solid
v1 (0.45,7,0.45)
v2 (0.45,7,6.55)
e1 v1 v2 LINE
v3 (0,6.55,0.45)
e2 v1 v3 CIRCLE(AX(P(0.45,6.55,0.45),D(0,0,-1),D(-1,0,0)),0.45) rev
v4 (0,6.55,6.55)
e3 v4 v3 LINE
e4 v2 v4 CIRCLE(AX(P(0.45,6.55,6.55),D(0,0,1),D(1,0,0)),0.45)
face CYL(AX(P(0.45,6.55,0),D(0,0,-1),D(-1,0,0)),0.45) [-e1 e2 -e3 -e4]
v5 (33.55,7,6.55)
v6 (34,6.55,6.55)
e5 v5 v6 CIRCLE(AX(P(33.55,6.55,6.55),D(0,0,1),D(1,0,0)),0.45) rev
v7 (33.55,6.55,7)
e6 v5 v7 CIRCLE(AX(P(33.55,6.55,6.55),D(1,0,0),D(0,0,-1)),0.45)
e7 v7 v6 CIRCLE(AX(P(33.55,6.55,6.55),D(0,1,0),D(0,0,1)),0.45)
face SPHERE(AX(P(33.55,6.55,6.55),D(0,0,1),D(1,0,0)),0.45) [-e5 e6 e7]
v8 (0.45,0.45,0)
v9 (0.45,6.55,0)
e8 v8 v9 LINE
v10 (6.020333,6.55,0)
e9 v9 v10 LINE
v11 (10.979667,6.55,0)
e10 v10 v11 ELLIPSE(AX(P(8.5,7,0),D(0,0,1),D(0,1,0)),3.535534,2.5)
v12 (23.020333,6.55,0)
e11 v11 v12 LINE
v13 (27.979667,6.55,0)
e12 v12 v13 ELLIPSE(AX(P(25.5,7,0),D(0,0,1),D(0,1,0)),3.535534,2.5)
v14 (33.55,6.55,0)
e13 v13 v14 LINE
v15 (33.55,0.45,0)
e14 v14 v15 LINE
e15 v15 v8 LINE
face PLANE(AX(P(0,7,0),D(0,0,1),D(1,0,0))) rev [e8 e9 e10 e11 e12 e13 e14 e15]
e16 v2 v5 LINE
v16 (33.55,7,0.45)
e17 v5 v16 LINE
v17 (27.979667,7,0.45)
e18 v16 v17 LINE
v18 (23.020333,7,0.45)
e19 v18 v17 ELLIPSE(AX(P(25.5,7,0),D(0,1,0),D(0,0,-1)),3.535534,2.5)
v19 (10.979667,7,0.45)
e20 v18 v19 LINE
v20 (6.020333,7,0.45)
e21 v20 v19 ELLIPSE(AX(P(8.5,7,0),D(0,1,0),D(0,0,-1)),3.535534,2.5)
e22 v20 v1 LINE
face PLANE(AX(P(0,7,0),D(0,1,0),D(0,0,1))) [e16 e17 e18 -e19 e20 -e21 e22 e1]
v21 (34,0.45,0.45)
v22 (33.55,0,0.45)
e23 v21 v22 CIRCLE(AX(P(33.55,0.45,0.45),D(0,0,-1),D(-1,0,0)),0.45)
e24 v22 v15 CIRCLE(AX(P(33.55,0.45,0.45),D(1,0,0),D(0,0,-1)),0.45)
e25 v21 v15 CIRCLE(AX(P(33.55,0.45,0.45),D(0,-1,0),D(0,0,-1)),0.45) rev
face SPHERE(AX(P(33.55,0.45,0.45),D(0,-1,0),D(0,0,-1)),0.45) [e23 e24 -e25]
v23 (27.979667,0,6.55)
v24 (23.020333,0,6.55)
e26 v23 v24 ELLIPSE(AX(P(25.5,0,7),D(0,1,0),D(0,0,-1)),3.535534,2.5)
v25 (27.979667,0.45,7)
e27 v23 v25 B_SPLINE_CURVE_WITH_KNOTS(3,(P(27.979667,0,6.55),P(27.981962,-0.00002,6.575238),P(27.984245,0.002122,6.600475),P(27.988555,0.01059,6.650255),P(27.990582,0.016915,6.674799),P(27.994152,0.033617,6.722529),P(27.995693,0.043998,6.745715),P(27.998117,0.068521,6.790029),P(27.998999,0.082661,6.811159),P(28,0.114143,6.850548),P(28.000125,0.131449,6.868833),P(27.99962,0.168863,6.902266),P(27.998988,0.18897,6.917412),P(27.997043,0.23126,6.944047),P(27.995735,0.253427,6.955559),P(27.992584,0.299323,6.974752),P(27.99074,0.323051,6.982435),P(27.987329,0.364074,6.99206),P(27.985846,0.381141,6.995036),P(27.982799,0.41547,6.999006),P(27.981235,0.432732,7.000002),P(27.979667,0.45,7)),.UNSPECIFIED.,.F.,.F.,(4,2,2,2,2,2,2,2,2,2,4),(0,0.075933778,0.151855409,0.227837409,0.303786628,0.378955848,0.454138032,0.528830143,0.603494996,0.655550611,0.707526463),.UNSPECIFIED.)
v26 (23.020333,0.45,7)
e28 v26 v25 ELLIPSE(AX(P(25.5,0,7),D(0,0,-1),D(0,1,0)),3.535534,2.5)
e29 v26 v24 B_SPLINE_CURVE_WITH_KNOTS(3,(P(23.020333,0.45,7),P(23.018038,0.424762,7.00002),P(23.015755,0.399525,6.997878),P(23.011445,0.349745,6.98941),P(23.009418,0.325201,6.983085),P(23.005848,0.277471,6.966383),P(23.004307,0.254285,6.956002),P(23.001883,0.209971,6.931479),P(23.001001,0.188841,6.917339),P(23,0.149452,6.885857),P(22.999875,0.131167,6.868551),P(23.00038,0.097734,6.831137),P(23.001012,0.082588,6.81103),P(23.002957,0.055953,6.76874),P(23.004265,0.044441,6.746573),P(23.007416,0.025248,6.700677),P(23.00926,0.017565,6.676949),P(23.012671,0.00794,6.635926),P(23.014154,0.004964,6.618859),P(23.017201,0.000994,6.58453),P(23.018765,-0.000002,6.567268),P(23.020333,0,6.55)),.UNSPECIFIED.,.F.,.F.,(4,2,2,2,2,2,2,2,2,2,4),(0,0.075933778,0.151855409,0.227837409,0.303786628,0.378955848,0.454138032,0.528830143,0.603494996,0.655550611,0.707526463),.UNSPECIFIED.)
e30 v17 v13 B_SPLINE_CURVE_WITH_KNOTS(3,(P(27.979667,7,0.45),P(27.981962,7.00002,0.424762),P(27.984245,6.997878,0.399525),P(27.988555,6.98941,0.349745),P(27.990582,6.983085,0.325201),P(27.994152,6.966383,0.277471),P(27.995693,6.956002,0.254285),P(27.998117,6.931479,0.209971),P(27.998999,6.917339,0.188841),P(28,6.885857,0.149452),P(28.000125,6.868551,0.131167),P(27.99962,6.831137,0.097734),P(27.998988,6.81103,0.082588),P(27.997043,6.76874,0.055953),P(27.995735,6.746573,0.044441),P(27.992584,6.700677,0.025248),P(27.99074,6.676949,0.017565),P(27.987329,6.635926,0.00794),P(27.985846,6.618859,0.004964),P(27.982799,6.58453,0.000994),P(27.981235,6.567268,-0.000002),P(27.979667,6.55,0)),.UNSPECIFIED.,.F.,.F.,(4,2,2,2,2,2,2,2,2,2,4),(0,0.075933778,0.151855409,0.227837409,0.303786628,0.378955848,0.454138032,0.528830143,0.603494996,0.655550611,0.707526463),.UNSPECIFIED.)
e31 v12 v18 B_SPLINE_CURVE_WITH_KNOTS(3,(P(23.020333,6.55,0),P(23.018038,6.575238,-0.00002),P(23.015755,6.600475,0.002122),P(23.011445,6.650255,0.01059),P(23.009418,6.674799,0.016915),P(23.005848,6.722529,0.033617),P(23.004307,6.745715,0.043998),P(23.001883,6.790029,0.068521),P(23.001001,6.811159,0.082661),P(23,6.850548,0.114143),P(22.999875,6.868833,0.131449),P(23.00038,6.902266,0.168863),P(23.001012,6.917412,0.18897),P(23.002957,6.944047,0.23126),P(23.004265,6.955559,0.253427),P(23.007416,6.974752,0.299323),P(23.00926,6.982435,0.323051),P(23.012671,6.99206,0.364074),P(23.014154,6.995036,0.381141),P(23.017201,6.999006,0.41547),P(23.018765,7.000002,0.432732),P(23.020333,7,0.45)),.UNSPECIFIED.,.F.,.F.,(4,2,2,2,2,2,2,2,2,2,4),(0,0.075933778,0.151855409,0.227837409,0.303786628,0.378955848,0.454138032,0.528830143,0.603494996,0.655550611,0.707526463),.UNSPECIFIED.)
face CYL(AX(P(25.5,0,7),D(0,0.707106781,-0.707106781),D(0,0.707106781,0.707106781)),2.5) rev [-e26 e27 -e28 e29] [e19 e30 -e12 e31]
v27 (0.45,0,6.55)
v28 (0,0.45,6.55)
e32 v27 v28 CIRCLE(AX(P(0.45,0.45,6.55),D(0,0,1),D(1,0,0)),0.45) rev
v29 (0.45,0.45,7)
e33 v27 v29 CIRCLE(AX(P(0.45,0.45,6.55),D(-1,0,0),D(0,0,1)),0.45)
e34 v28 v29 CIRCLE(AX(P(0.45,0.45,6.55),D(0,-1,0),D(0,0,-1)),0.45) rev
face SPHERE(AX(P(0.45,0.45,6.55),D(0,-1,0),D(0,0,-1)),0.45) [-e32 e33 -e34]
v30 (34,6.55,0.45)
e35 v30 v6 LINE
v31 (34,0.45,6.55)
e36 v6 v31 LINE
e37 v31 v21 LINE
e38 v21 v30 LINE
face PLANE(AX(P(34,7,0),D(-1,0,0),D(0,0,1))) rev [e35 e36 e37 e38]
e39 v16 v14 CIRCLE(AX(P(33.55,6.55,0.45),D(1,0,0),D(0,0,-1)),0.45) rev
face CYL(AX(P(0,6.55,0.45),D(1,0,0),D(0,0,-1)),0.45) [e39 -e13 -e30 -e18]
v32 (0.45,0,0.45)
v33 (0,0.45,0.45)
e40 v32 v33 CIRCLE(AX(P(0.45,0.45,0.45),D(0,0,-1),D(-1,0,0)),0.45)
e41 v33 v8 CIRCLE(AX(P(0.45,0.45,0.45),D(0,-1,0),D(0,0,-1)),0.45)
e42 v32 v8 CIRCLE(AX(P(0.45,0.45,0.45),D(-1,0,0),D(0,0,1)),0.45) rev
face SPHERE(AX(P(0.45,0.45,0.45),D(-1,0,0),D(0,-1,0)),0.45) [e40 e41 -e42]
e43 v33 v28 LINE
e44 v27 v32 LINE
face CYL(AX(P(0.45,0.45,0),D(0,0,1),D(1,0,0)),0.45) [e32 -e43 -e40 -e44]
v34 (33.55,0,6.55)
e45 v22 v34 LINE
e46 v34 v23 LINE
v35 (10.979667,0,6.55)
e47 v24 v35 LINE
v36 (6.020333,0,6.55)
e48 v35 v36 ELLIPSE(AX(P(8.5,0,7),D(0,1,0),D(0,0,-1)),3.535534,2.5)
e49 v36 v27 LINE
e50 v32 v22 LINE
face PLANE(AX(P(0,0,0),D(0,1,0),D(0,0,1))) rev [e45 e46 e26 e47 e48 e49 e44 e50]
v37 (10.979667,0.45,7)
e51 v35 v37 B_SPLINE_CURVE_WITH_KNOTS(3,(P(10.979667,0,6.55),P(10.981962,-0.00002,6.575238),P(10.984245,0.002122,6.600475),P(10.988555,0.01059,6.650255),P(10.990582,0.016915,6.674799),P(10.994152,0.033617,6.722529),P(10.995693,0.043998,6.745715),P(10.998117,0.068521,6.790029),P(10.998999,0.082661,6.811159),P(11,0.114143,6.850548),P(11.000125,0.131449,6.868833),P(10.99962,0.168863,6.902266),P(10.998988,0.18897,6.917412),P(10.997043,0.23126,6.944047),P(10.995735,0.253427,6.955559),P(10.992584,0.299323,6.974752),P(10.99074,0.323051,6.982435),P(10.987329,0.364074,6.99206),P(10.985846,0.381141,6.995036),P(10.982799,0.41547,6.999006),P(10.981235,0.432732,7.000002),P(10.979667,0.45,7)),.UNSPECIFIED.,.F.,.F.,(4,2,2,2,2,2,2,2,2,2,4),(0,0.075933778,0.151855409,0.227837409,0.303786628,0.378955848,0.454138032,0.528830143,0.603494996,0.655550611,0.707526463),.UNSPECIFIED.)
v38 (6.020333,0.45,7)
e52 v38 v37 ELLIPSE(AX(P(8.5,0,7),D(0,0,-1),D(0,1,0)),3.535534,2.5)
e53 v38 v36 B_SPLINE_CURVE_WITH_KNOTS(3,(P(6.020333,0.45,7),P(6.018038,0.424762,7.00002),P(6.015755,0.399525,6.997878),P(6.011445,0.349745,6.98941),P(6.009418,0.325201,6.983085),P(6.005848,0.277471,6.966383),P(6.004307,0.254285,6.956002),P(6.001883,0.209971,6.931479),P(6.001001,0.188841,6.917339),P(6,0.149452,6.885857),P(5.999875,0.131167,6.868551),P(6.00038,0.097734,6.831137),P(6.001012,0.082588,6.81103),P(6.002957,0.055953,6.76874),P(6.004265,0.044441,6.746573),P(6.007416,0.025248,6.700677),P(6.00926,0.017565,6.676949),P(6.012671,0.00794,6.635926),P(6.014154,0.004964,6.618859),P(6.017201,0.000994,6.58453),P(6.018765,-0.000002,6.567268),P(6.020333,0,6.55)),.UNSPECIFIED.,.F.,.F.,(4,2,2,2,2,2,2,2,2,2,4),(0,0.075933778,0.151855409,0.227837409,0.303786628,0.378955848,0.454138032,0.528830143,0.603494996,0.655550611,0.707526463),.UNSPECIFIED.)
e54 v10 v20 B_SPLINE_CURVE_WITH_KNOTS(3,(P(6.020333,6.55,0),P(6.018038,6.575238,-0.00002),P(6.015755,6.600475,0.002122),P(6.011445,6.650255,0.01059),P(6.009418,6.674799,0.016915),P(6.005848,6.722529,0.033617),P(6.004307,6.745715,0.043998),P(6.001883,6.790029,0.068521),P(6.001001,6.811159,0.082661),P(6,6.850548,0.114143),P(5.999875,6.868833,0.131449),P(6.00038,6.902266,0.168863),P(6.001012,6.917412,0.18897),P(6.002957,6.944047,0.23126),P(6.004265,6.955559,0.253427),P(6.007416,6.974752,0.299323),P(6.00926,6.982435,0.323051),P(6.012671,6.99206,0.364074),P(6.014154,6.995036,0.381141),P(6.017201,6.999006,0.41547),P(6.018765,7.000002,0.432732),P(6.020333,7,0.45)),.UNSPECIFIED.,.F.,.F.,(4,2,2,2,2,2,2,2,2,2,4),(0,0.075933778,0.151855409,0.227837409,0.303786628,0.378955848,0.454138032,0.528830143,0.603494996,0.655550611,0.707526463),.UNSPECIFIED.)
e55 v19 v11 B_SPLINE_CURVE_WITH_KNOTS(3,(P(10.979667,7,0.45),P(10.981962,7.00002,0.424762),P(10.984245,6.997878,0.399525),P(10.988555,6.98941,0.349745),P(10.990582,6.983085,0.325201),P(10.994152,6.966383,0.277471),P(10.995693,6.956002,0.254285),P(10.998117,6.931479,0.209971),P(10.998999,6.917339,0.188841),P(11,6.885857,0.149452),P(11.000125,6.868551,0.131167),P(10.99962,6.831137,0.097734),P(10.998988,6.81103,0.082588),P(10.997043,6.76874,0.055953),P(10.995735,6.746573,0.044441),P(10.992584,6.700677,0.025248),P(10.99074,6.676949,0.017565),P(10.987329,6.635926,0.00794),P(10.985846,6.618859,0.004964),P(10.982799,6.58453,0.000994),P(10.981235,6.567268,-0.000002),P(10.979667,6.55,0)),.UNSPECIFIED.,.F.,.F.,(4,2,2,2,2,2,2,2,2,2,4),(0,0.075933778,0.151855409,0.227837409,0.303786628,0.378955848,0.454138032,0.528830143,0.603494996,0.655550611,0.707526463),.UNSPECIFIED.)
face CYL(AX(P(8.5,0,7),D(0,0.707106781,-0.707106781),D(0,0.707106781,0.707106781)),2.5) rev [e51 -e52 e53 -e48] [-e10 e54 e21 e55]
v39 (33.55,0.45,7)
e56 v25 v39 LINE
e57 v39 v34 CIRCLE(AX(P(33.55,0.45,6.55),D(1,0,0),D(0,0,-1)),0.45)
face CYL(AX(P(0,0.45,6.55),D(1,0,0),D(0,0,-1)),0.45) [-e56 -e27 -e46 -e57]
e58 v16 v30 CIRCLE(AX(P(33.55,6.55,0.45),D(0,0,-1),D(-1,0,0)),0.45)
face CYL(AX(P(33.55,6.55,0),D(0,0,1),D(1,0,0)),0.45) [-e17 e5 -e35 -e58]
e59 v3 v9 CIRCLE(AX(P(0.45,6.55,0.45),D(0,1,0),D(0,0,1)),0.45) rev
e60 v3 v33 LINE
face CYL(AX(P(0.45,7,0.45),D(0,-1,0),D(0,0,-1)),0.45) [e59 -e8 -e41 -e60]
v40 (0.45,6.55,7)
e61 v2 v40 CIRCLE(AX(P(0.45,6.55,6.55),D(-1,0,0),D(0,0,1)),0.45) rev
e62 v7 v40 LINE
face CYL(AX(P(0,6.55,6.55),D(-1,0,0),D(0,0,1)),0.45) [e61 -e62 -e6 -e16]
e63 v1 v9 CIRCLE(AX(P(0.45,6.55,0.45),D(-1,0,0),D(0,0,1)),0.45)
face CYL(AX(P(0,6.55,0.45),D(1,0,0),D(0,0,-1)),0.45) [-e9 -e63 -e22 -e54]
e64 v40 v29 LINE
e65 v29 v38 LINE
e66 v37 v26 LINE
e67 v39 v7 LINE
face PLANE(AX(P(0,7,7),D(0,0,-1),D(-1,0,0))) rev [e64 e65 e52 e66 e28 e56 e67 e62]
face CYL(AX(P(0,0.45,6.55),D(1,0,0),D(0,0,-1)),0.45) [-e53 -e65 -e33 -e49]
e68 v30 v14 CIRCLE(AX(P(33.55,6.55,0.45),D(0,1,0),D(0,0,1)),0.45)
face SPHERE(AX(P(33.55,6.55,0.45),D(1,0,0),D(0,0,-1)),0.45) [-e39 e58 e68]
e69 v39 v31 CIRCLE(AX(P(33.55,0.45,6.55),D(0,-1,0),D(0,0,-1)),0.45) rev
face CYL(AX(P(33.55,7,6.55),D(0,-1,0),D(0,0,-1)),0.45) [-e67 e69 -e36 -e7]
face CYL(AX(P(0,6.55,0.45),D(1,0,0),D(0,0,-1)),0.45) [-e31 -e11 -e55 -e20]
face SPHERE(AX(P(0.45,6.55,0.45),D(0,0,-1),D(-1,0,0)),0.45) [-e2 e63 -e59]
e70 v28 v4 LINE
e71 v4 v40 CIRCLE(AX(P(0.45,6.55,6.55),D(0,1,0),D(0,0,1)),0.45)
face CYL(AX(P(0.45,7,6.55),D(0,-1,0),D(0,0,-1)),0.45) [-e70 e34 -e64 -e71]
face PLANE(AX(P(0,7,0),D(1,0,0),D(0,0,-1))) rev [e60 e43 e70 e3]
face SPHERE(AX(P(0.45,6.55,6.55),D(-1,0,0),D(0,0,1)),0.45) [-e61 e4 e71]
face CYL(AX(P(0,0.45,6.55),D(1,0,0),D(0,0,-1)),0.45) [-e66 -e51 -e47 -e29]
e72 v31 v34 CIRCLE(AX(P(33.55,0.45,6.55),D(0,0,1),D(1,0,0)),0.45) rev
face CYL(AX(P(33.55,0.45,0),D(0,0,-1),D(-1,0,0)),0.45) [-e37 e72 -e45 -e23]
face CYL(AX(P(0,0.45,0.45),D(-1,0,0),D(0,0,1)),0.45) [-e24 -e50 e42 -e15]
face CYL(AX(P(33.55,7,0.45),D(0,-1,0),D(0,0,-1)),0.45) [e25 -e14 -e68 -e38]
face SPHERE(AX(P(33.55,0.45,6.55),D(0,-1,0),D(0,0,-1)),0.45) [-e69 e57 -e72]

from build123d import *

# Parameters (mm, degrees)
SKETCH1_W               = 34
SKETCH1_H               = 7
BOSS_EXTRUDE1_DEPTH     = 7
CUT_EXTRUDE2_DEPTH      = 36.411862419
CUT_EXTRUDE2_DEPTH_BACK = 36.411862419
SKETCH6_OUTSIDE_W       = 43.082
SKETCH6_OUTSIDE_H       = 18.981
SKETCH6_OUTSIDE_W_2     = 34
SKETCH6_OUTSIDE_H_2     = 9.899494937
SKETCH6_OUTSIDE_R       = 2.5
FILLET1_R               = 0.45


with BuildPart() as part:
    # sketch1 → Boss-Extrude1 (new body)
    with BuildSketch(Plane(origin=(0, 0, 0), x_dir=(1, 0, 0), z_dir=(0, 1, 0))):
        with Locations((17, -3.5)):
            Rectangle(SKETCH1_W, SKETCH1_H)
    extrude(amount=BOSS_EXTRUDE1_DEPTH)

    # Sketch6 outside → Cut-Extrude2 (cut, two sides: drawn at the far end of the back side and taken through both)
    # profile 1 of 3: a face of its own
    with BuildSketch(Plane(origin=(0, 0, 0), x_dir=(-1, 0, 0), z_dir=(0, 0.7071067811865475, -0.7071067811865477)).offset(-CUT_EXTRUDE2_DEPTH_BACK)):
        with Locations((-17, 4.9495)):
            Rectangle(SKETCH6_OUTSIDE_W, SKETCH6_OUTSIDE_H)
        with Locations((-17, 4.949747469)):
            Rectangle(SKETCH6_OUTSIDE_W_2, SKETCH6_OUTSIDE_H_2, mode=Mode.SUBTRACT)
    # profile 2 of 3: a face of its own
    with BuildSketch(Plane(origin=(0, 0, 0), x_dir=(-1, 0, 0), z_dir=(0, 0.7071067811865475, -0.7071067811865477)).offset(-CUT_EXTRUDE2_DEPTH_BACK)):
        with Locations((-25.5, 4.949747468)):
            Circle(SKETCH6_OUTSIDE_R)
    # profile 3 of 3: a face of its own
    with BuildSketch(Plane(origin=(0, 0, 0), x_dir=(-1, 0, 0), z_dir=(0, 0.7071067811865475, -0.7071067811865477)).offset(-CUT_EXTRUDE2_DEPTH_BACK)):
        with Locations(Location((-8.5, 4.949747468, 0), (0, 0, 180))):
            Circle(SKETCH6_OUTSIDE_R)
    extrude(amount=CUT_EXTRUDE2_DEPTH + CUT_EXTRUDE2_DEPTH_BACK, mode=Mode.SUBTRACT)

    # Fillet1
    # the kernel refuses this fillet: 0.45 mm, written as the material it takes off along each edge
    with BuildSketch(Plane(origin=(33.55, 6.55, 0.45), x_dir=(1, 0, 0), z_dir=(0, 0, -1))) as fillet1_piece_1_section:
        Polygon((0, 0), (FILLET1_R, 0), (FILLET1_R, -FILLET1_R), (0, -FILLET1_R), align=None)
    fillet1_piece_1 = extrude(amount=FILLET1_R, mode=Mode.PRIVATE)
    fillet1_piece_1 = fillet1_piece_1 - Plane(origin=(33.55, 6.55, 0.45), x_dir=(-0.7071067811865475, -0.7071067811865475, 0), z_dir=(0, 0, -1)) * Sphere(FILLET1_R, mode=Mode.PRIVATE)
    add(fillet1_piece_1, mode=Mode.SUBTRACT)
    with BuildSketch(Plane(origin=(0.45, 6.55, 0.45), x_dir=(0, 1, 0), z_dir=(0, 0, -1))) as fillet1_piece_2_section:
        Polygon((0, 0), (FILLET1_R, 0), (FILLET1_R, -FILLET1_R), (0, -FILLET1_R), align=None)
    fillet1_piece_2 = extrude(amount=FILLET1_R, mode=Mode.PRIVATE)
    fillet1_piece_2 = fillet1_piece_2 - Plane(origin=(0.45, 6.55, 0.45), x_dir=(0.7071067811865475, -0.7071067811865475, 0), z_dir=(0, 0, -1)) * Sphere(FILLET1_R, mode=Mode.PRIVATE)
    add(fillet1_piece_2, mode=Mode.SUBTRACT)
    with BuildSketch(Plane(origin=(33.55, 0.45, 0.45), x_dir=(0, -1, 0), z_dir=(0, 0, -1))) as fillet1_piece_3_section:
        Polygon((0, 0), (FILLET1_R, 0), (FILLET1_R, -FILLET1_R), (0, -FILLET1_R), align=None)
    fillet1_piece_3 = extrude(amount=FILLET1_R, mode=Mode.PRIVATE)
    fillet1_piece_3 = fillet1_piece_3 - Plane(origin=(33.55, 0.45, 0.45), x_dir=(-0.7071067811865475, 0.7071067811865475, 0), z_dir=(0, 0, -1)) * Sphere(FILLET1_R, mode=Mode.PRIVATE)
    add(fillet1_piece_3, mode=Mode.SUBTRACT)
    with BuildSketch(Plane(origin=(33.55, 0.45, 6.55), x_dir=(1, 0, 0), z_dir=(0, -1, 0))) as fillet1_piece_4_section:
        Polygon((0, 0), (FILLET1_R, 0), (FILLET1_R, FILLET1_R), (0, FILLET1_R), align=None)
    fillet1_piece_4 = extrude(amount=FILLET1_R, mode=Mode.PRIVATE)
    fillet1_piece_4 = fillet1_piece_4 - Plane(origin=(33.55, 0.45, 6.55), x_dir=(-0.7071067811865475, 0, -0.7071067811865475), z_dir=(0, -1, 0)) * Sphere(FILLET1_R, mode=Mode.PRIVATE)
    add(fillet1_piece_4, mode=Mode.SUBTRACT)
    with BuildSketch(Plane(origin=(33.55, 6.55, 6.55), x_dir=(0, 1, 0), z_dir=(1, 0, 0))) as fillet1_piece_5_section:
        Polygon((0, 0), (FILLET1_R, 0), (FILLET1_R, FILLET1_R), (0, FILLET1_R), align=None)
    fillet1_piece_5 = extrude(amount=FILLET1_R, mode=Mode.PRIVATE)
    fillet1_piece_5 = fillet1_piece_5 - Plane(origin=(33.55, 6.55, 6.55), x_dir=(0, -0.7071067811865475, -0.7071067811865475), z_dir=(1, 0, 0)) * Sphere(FILLET1_R, mode=Mode.PRIVATE)
    add(fillet1_piece_5, mode=Mode.SUBTRACT)
    with BuildSketch(Plane(origin=(0.45, 0.45, 6.55), x_dir=(-1, 0, 0), z_dir=(0, -1, 0))) as fillet1_piece_6_section:
        Polygon((0, 0), (FILLET1_R, 0), (FILLET1_R, -FILLET1_R), (0, -FILLET1_R), align=None)
    fillet1_piece_6 = extrude(amount=FILLET1_R, mode=Mode.PRIVATE)
    fillet1_piece_6 = fillet1_piece_6 - Plane(origin=(0.45, 0.45, 6.55), x_dir=(0.7071067811865475, 0, -0.7071067811865477), z_dir=(0, -1, 0)) * Sphere(FILLET1_R, mode=Mode.PRIVATE)
    add(fillet1_piece_6, mode=Mode.SUBTRACT)
    with BuildSketch(Plane(origin=(0.45, 0.45, 0.45), x_dir=(0, -1, 0), z_dir=(0, 0, -1))) as fillet1_piece_7_section:
        Polygon((0, 0), (FILLET1_R, 0), (FILLET1_R, FILLET1_R), (0, FILLET1_R), align=None)
    fillet1_piece_7 = extrude(amount=FILLET1_R, mode=Mode.PRIVATE)
    fillet1_piece_7 = fillet1_piece_7 - Plane(origin=(0.45, 0.45, 0.45), x_dir=(0.7071067811865475, 0.7071067811865475, 0), z_dir=(0, 0, -1)) * Sphere(FILLET1_R, mode=Mode.PRIVATE)
    add(fillet1_piece_7, mode=Mode.SUBTRACT)
    with BuildSketch(Plane(origin=(0.45, 6.55, 6.55), x_dir=(-1, 0, 0), z_dir=(0, 1, 0))) as fillet1_piece_8_section:
        Polygon((0, 0), (FILLET1_R, 0), (FILLET1_R, FILLET1_R), (0, FILLET1_R), align=None)
    fillet1_piece_8 = extrude(amount=FILLET1_R, mode=Mode.PRIVATE)
    fillet1_piece_8 = fillet1_piece_8 - Plane(origin=(0.45, 6.55, 6.55), x_dir=(0.7071067811865475, 0, -0.7071067811865477), z_dir=(0, 1, 0)) * Sphere(FILLET1_R, mode=Mode.PRIVATE)
    add(fillet1_piece_8, mode=Mode.SUBTRACT)
    with BuildSketch(Plane(origin=(26.875, 7, 0), x_dir=(0, -1, 0), z_dir=(1, 0, 0)), Plane(origin=(0.45, 7, 0), x_dir=(0, -1, 0), z_dir=(1, 0, 0)), Plane(origin=(33.55, 0, 7), x_dir=(0, 0, -1), z_dir=(-1, 0, 0)), Plane(origin=(7.125, 0, 7), x_dir=(0, 0, -1), z_dir=(-1, 0, 0))) as fillet1_piece_9:
        with BuildLine():
            CenterArc((FILLET1_R, -FILLET1_R), FILLET1_R, 90, 90)
            Line((0, -FILLET1_R), (0, 0))
            Line((0, 0), (FILLET1_R, 0))
        make_face()
    extrude(amount=6.675, mode=Mode.SUBTRACT)
    with BuildSketch(Plane(origin=(9.875, 7, 0), x_dir=(0, -1, 0), z_dir=(1, 0, 0)), Plane(origin=(24.125, 0, 7), x_dir=(0, 0, -1), z_dir=(-1, 0, 0))) as fillet1_piece_10:
        with BuildLine():
            CenterArc((FILLET1_R, -FILLET1_R), FILLET1_R, 90, 90)
            Line((0, -FILLET1_R), (0, 0))
            Line((0, 0), (FILLET1_R, 0))
        make_face()
    extrude(amount=14.25, mode=Mode.SUBTRACT)
    with BuildSketch(Plane(origin=(34, 0, 0.45), x_dir=(-1, 0, 0), z_dir=(0, 0, 1)), Plane(origin=(34, 7, 0.45), x_dir=(0, -1, 0), z_dir=(0, 0, 1)), Plane(origin=(0, 0.45, 0), x_dir=(1, 0, 0), z_dir=(0, 1, 0)), Plane(origin=(0, 0.45, 7), x_dir=(0, 0, -1), z_dir=(0, 1, 0)), Plane(origin=(0, 0, 6.55), x_dir=(1, 0, 0), z_dir=(0, 0, -1))) as fillet1_piece_11:
        with BuildLine():
            CenterArc((FILLET1_R, -FILLET1_R), FILLET1_R, 90, 90)
            Line((0, -FILLET1_R), (0, 0))
            Line((0, 0), (FILLET1_R, 0))
        make_face()
    extrude(amount=6.1, mode=Mode.SUBTRACT)
    with BuildSketch(Plane(origin=(34, 0.45, 0), x_dir=(-1, 0, 0), z_dir=(0, 1, 0)), Plane(origin=(34, 0.45, 7), x_dir=(0, 0, -1), z_dir=(0, 1, 0)), Plane(origin=(0, 7, 6.55), x_dir=(1, 0, 0), z_dir=(0, 0, -1))) as fillet1_piece_12:
        with BuildLine():
            CenterArc((FILLET1_R, FILLET1_R), FILLET1_R, 180, 90)
            Line((0, FILLET1_R), (0, 0))
            Line((0, 0), (FILLET1_R, 0))
        make_face()
    extrude(amount=6.1, mode=Mode.SUBTRACT)
    with BuildSketch(Plane(origin=(0.45, 0, 0), x_dir=(0, 1, 0), z_dir=(1, 0, 0)), Plane(origin=(33.55, 7, 7), x_dir=(0, 0, -1), z_dir=(-1, 0, 0))) as fillet1_piece_13:
        with BuildLine():
            CenterArc((FILLET1_R, FILLET1_R), FILLET1_R, 180, 90)
            Line((0, FILLET1_R), (0, 0))
            Line((0, 0), (FILLET1_R, 0))
        make_face()
    extrude(amount=33.1, mode=Mode.SUBTRACT)


solid = part.part
